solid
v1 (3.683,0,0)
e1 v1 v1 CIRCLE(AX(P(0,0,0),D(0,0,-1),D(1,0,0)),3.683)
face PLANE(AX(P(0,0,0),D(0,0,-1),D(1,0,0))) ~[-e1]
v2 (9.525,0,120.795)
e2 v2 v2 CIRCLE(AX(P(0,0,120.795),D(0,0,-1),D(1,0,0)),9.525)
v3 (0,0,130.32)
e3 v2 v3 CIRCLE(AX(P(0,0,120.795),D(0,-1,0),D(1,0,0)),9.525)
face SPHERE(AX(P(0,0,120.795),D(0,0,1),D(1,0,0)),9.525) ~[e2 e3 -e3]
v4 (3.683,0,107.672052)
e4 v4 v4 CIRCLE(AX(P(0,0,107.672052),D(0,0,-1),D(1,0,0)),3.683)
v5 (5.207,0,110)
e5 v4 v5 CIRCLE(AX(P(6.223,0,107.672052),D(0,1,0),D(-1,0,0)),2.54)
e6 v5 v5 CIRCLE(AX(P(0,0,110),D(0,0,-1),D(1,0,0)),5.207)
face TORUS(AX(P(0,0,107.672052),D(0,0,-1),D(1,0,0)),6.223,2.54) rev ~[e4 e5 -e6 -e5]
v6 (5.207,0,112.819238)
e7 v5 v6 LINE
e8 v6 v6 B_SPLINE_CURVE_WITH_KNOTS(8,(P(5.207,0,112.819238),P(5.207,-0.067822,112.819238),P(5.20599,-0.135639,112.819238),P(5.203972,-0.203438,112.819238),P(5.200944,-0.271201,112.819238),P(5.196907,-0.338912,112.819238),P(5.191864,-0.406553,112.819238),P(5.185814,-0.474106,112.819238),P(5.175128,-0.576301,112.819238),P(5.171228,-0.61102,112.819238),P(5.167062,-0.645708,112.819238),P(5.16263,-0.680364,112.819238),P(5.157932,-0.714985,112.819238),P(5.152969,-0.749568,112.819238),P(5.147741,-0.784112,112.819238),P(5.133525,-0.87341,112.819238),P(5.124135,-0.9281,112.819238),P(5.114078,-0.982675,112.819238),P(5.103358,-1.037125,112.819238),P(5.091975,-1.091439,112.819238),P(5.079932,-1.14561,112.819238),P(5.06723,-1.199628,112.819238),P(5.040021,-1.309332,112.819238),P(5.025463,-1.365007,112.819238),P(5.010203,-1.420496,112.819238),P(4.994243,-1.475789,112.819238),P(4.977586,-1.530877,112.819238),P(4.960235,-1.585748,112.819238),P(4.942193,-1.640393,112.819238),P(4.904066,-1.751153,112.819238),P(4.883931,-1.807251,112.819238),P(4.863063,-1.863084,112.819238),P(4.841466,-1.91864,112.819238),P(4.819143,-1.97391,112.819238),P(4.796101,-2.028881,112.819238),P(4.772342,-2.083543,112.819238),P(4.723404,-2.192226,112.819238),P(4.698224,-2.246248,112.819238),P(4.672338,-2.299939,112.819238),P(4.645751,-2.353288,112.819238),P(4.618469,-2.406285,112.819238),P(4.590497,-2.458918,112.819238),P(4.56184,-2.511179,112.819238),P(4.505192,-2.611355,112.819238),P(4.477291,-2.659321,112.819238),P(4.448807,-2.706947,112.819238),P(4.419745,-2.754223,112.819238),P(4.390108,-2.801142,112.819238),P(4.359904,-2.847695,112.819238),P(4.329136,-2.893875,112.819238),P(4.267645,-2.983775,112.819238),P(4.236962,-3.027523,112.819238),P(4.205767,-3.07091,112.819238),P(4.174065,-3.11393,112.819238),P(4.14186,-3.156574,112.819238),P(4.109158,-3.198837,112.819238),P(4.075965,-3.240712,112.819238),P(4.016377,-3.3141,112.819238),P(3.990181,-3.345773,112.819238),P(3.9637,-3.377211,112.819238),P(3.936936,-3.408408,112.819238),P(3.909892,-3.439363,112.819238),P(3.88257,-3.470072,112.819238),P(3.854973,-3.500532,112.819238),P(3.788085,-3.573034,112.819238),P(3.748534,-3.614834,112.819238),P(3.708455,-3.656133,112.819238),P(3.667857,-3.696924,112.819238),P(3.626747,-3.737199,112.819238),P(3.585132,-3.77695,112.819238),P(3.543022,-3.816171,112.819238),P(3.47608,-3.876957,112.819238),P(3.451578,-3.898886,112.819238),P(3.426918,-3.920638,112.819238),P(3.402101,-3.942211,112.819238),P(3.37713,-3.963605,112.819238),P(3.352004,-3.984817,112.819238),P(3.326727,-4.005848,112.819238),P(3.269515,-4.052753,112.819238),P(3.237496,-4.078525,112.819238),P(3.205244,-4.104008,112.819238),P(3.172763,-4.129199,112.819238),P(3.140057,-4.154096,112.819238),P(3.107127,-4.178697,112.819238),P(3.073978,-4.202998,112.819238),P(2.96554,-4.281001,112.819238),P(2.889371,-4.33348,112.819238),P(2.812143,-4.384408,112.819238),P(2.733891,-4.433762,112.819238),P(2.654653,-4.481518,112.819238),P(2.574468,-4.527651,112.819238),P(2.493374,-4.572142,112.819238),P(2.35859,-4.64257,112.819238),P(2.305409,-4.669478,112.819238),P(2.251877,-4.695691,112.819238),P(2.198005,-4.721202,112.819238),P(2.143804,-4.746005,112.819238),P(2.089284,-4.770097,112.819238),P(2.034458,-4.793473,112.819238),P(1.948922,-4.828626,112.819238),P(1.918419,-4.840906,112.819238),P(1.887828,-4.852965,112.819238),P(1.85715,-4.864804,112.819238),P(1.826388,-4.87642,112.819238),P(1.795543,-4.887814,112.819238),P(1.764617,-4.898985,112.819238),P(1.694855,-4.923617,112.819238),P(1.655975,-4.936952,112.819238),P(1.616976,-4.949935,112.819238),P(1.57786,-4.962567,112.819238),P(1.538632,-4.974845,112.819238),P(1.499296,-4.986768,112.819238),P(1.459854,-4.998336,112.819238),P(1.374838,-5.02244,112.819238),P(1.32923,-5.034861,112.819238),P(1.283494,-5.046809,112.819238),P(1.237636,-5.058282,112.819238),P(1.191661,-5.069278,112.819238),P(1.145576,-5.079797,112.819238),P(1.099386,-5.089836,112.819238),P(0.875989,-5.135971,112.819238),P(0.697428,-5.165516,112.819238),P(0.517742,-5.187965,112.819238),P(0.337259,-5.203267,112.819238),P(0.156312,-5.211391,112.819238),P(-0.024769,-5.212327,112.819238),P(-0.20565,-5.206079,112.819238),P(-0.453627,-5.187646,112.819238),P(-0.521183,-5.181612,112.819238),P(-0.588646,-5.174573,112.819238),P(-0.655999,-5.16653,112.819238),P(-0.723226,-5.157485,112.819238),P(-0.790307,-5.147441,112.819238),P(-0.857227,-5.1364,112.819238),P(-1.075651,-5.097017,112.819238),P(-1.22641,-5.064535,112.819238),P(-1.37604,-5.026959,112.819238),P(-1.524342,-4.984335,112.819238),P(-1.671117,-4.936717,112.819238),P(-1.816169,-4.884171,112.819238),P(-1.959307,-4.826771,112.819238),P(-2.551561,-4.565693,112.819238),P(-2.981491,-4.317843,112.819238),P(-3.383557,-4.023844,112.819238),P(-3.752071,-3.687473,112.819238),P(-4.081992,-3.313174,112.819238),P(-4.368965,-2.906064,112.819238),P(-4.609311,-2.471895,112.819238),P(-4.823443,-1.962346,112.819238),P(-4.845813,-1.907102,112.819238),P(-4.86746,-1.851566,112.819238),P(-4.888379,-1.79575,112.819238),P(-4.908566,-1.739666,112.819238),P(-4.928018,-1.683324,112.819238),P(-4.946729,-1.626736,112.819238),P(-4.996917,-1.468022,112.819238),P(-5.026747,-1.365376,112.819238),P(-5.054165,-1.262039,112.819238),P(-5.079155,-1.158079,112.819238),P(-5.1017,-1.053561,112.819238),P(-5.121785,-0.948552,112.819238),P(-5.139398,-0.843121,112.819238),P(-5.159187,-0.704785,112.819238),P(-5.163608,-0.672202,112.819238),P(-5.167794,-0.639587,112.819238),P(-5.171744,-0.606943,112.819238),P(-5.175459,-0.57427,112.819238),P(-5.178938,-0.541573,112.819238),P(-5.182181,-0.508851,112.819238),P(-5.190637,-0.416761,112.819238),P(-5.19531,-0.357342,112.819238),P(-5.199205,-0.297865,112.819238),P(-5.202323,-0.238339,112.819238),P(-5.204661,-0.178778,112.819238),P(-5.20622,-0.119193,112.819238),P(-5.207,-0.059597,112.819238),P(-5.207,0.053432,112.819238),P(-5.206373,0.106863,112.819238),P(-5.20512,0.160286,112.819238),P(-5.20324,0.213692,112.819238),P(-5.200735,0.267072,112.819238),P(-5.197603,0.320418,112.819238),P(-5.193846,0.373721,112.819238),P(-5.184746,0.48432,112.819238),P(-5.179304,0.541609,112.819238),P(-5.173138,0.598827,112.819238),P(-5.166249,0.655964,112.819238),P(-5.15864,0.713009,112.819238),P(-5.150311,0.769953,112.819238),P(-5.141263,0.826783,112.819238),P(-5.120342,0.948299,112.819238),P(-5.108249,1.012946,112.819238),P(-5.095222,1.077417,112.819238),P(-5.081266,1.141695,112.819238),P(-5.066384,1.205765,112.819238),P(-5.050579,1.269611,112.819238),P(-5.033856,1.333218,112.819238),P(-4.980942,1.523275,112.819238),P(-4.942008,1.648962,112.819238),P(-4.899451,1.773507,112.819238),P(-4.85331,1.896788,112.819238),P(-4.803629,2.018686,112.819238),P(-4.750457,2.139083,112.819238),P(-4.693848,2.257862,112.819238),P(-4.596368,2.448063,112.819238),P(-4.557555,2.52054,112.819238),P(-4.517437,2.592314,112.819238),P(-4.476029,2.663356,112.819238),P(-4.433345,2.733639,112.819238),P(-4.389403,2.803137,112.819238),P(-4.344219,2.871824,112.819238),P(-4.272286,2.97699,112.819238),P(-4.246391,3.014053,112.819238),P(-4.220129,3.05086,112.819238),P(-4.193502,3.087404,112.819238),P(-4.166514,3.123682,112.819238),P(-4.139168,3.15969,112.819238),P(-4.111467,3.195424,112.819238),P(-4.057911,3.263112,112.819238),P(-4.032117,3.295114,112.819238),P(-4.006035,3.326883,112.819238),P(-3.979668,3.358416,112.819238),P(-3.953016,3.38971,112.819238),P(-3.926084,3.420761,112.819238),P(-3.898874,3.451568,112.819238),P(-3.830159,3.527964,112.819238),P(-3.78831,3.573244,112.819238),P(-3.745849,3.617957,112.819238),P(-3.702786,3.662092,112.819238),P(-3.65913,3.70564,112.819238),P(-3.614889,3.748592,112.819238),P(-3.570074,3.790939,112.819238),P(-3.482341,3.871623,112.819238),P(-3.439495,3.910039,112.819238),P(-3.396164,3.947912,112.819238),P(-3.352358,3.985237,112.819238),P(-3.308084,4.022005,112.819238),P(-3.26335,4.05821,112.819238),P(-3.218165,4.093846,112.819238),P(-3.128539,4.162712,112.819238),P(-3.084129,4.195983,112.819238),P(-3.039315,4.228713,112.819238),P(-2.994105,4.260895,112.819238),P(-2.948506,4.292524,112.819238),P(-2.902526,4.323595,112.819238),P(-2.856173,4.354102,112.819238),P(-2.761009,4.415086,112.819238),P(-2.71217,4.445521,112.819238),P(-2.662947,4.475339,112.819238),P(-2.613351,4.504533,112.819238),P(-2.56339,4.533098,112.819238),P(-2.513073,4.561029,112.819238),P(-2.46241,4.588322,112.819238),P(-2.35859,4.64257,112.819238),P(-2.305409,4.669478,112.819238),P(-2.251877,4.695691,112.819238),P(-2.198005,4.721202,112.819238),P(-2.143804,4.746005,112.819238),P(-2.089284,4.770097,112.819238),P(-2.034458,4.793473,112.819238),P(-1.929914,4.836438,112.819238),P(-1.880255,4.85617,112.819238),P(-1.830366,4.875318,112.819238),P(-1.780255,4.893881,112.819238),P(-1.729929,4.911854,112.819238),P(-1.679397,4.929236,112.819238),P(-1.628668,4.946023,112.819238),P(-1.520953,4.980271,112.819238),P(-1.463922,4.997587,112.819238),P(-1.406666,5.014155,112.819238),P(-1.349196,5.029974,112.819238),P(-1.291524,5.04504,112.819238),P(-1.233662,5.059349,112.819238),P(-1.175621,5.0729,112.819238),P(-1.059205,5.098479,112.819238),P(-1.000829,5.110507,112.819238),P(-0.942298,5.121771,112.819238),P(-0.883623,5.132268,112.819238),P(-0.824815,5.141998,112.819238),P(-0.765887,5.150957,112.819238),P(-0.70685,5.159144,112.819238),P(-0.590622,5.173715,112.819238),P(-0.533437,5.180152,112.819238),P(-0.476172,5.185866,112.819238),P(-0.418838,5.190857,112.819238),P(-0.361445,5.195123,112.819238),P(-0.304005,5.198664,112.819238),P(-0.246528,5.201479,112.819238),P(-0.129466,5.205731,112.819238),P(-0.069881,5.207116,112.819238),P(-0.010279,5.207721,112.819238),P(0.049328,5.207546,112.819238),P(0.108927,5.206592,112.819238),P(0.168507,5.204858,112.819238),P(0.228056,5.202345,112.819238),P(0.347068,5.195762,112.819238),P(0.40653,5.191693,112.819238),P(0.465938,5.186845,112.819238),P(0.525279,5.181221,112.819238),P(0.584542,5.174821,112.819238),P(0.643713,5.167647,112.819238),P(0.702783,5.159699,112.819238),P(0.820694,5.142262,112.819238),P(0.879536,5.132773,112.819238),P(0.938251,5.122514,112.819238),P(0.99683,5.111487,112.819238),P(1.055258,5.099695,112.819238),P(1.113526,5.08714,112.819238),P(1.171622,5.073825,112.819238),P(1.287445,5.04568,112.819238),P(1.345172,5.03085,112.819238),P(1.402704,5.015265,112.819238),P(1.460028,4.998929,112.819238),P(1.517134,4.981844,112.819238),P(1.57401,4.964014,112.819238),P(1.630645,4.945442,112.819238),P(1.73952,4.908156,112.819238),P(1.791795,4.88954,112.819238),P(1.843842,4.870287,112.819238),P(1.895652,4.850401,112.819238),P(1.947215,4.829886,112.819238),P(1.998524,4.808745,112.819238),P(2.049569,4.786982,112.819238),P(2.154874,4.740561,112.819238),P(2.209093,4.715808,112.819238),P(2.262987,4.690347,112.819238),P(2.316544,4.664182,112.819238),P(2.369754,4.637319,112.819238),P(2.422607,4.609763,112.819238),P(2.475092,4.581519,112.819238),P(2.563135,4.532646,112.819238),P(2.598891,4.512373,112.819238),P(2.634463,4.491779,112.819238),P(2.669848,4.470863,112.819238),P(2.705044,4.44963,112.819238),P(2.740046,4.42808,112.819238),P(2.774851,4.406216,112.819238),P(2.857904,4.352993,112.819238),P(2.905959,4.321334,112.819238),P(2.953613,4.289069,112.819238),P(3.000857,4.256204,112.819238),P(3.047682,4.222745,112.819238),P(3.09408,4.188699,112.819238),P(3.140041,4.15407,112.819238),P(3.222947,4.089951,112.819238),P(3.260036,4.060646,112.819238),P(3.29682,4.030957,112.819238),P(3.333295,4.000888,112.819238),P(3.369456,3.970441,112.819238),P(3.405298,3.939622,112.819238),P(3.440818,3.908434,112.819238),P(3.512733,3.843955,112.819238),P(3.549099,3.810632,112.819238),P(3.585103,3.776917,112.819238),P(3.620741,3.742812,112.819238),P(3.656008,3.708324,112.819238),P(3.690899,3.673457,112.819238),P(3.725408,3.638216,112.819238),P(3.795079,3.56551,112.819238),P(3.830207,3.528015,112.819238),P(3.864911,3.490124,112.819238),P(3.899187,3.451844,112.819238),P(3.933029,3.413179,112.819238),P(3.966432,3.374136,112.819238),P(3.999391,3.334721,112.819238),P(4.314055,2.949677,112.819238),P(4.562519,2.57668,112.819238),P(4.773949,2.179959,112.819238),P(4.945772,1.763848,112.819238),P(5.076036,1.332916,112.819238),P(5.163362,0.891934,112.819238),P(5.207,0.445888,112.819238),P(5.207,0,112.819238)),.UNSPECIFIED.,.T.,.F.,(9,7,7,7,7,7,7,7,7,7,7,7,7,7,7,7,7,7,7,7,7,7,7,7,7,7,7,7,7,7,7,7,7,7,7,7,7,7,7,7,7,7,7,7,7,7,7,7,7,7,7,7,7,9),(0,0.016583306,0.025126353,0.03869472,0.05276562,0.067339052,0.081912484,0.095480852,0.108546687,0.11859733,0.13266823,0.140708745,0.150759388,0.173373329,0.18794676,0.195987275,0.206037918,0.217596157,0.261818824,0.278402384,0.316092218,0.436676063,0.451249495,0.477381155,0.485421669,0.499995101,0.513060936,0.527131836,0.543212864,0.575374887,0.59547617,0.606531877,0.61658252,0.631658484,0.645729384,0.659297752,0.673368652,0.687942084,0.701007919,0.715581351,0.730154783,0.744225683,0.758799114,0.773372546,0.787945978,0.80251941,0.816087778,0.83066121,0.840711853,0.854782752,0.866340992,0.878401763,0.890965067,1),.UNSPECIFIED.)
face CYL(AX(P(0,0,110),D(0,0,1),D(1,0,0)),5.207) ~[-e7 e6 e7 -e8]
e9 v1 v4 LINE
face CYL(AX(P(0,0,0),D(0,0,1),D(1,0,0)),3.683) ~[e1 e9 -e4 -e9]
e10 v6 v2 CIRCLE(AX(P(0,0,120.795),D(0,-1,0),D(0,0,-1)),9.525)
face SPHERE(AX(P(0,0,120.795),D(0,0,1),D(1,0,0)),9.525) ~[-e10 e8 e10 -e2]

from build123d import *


# Not quite as in the source:
# - a fillet or chamfer that OpenCascade refuses, or shapes differently, is made with other operations: its cross-section is extruded or revolved along the edge and cut away or added


with BuildPart() as f1:
    # F0 (on Front) → F1 (revolve)
    with BuildSketch(Plane.XZ):
        Polygon((0, 113.175), (0, 0), (3.683, 0), (3.683, 110), (5.207, 110), (5.207, 113.175), align=None)
    revolve(axis=Axis((0, 0, 56.5875), (0, 0, -1)))

    # F2: fillet of radius 2.54 on 1 edges, made by hand

    # F2_s1 → F2_t2 (revolve)
    with BuildSketch(Plane.XZ):
        with BuildLine():
            ThreePointArc((3.683, 107.672051547), (4.0978835326, 109.063266843), (5.207, 110))
            Line((5.207, 110), (3.683, 110))
            Line((3.683, 110), (3.683, 107.672051547))
        make_face()
    revolve(axis=Axis((0, 0, 110), (0, 0, -1)))

    # F3 (on Front) → F4 (revolve)
    with BuildSketch(Plane.XZ):
        with BuildLine():
            ThreePointArc((0, 111.27), (6.7351920908, 114.0598079092), (9.525, 120.795))
            ThreePointArc((9.525, 120.795), (6.7351920908, 127.5301920908), (0, 130.32))
            Line((0, 130.32), (0, 111.27))
        make_face()
    revolve(axis=Axis((0, 0, 120.795), (0, 0, -1)))


solid = f1.part
